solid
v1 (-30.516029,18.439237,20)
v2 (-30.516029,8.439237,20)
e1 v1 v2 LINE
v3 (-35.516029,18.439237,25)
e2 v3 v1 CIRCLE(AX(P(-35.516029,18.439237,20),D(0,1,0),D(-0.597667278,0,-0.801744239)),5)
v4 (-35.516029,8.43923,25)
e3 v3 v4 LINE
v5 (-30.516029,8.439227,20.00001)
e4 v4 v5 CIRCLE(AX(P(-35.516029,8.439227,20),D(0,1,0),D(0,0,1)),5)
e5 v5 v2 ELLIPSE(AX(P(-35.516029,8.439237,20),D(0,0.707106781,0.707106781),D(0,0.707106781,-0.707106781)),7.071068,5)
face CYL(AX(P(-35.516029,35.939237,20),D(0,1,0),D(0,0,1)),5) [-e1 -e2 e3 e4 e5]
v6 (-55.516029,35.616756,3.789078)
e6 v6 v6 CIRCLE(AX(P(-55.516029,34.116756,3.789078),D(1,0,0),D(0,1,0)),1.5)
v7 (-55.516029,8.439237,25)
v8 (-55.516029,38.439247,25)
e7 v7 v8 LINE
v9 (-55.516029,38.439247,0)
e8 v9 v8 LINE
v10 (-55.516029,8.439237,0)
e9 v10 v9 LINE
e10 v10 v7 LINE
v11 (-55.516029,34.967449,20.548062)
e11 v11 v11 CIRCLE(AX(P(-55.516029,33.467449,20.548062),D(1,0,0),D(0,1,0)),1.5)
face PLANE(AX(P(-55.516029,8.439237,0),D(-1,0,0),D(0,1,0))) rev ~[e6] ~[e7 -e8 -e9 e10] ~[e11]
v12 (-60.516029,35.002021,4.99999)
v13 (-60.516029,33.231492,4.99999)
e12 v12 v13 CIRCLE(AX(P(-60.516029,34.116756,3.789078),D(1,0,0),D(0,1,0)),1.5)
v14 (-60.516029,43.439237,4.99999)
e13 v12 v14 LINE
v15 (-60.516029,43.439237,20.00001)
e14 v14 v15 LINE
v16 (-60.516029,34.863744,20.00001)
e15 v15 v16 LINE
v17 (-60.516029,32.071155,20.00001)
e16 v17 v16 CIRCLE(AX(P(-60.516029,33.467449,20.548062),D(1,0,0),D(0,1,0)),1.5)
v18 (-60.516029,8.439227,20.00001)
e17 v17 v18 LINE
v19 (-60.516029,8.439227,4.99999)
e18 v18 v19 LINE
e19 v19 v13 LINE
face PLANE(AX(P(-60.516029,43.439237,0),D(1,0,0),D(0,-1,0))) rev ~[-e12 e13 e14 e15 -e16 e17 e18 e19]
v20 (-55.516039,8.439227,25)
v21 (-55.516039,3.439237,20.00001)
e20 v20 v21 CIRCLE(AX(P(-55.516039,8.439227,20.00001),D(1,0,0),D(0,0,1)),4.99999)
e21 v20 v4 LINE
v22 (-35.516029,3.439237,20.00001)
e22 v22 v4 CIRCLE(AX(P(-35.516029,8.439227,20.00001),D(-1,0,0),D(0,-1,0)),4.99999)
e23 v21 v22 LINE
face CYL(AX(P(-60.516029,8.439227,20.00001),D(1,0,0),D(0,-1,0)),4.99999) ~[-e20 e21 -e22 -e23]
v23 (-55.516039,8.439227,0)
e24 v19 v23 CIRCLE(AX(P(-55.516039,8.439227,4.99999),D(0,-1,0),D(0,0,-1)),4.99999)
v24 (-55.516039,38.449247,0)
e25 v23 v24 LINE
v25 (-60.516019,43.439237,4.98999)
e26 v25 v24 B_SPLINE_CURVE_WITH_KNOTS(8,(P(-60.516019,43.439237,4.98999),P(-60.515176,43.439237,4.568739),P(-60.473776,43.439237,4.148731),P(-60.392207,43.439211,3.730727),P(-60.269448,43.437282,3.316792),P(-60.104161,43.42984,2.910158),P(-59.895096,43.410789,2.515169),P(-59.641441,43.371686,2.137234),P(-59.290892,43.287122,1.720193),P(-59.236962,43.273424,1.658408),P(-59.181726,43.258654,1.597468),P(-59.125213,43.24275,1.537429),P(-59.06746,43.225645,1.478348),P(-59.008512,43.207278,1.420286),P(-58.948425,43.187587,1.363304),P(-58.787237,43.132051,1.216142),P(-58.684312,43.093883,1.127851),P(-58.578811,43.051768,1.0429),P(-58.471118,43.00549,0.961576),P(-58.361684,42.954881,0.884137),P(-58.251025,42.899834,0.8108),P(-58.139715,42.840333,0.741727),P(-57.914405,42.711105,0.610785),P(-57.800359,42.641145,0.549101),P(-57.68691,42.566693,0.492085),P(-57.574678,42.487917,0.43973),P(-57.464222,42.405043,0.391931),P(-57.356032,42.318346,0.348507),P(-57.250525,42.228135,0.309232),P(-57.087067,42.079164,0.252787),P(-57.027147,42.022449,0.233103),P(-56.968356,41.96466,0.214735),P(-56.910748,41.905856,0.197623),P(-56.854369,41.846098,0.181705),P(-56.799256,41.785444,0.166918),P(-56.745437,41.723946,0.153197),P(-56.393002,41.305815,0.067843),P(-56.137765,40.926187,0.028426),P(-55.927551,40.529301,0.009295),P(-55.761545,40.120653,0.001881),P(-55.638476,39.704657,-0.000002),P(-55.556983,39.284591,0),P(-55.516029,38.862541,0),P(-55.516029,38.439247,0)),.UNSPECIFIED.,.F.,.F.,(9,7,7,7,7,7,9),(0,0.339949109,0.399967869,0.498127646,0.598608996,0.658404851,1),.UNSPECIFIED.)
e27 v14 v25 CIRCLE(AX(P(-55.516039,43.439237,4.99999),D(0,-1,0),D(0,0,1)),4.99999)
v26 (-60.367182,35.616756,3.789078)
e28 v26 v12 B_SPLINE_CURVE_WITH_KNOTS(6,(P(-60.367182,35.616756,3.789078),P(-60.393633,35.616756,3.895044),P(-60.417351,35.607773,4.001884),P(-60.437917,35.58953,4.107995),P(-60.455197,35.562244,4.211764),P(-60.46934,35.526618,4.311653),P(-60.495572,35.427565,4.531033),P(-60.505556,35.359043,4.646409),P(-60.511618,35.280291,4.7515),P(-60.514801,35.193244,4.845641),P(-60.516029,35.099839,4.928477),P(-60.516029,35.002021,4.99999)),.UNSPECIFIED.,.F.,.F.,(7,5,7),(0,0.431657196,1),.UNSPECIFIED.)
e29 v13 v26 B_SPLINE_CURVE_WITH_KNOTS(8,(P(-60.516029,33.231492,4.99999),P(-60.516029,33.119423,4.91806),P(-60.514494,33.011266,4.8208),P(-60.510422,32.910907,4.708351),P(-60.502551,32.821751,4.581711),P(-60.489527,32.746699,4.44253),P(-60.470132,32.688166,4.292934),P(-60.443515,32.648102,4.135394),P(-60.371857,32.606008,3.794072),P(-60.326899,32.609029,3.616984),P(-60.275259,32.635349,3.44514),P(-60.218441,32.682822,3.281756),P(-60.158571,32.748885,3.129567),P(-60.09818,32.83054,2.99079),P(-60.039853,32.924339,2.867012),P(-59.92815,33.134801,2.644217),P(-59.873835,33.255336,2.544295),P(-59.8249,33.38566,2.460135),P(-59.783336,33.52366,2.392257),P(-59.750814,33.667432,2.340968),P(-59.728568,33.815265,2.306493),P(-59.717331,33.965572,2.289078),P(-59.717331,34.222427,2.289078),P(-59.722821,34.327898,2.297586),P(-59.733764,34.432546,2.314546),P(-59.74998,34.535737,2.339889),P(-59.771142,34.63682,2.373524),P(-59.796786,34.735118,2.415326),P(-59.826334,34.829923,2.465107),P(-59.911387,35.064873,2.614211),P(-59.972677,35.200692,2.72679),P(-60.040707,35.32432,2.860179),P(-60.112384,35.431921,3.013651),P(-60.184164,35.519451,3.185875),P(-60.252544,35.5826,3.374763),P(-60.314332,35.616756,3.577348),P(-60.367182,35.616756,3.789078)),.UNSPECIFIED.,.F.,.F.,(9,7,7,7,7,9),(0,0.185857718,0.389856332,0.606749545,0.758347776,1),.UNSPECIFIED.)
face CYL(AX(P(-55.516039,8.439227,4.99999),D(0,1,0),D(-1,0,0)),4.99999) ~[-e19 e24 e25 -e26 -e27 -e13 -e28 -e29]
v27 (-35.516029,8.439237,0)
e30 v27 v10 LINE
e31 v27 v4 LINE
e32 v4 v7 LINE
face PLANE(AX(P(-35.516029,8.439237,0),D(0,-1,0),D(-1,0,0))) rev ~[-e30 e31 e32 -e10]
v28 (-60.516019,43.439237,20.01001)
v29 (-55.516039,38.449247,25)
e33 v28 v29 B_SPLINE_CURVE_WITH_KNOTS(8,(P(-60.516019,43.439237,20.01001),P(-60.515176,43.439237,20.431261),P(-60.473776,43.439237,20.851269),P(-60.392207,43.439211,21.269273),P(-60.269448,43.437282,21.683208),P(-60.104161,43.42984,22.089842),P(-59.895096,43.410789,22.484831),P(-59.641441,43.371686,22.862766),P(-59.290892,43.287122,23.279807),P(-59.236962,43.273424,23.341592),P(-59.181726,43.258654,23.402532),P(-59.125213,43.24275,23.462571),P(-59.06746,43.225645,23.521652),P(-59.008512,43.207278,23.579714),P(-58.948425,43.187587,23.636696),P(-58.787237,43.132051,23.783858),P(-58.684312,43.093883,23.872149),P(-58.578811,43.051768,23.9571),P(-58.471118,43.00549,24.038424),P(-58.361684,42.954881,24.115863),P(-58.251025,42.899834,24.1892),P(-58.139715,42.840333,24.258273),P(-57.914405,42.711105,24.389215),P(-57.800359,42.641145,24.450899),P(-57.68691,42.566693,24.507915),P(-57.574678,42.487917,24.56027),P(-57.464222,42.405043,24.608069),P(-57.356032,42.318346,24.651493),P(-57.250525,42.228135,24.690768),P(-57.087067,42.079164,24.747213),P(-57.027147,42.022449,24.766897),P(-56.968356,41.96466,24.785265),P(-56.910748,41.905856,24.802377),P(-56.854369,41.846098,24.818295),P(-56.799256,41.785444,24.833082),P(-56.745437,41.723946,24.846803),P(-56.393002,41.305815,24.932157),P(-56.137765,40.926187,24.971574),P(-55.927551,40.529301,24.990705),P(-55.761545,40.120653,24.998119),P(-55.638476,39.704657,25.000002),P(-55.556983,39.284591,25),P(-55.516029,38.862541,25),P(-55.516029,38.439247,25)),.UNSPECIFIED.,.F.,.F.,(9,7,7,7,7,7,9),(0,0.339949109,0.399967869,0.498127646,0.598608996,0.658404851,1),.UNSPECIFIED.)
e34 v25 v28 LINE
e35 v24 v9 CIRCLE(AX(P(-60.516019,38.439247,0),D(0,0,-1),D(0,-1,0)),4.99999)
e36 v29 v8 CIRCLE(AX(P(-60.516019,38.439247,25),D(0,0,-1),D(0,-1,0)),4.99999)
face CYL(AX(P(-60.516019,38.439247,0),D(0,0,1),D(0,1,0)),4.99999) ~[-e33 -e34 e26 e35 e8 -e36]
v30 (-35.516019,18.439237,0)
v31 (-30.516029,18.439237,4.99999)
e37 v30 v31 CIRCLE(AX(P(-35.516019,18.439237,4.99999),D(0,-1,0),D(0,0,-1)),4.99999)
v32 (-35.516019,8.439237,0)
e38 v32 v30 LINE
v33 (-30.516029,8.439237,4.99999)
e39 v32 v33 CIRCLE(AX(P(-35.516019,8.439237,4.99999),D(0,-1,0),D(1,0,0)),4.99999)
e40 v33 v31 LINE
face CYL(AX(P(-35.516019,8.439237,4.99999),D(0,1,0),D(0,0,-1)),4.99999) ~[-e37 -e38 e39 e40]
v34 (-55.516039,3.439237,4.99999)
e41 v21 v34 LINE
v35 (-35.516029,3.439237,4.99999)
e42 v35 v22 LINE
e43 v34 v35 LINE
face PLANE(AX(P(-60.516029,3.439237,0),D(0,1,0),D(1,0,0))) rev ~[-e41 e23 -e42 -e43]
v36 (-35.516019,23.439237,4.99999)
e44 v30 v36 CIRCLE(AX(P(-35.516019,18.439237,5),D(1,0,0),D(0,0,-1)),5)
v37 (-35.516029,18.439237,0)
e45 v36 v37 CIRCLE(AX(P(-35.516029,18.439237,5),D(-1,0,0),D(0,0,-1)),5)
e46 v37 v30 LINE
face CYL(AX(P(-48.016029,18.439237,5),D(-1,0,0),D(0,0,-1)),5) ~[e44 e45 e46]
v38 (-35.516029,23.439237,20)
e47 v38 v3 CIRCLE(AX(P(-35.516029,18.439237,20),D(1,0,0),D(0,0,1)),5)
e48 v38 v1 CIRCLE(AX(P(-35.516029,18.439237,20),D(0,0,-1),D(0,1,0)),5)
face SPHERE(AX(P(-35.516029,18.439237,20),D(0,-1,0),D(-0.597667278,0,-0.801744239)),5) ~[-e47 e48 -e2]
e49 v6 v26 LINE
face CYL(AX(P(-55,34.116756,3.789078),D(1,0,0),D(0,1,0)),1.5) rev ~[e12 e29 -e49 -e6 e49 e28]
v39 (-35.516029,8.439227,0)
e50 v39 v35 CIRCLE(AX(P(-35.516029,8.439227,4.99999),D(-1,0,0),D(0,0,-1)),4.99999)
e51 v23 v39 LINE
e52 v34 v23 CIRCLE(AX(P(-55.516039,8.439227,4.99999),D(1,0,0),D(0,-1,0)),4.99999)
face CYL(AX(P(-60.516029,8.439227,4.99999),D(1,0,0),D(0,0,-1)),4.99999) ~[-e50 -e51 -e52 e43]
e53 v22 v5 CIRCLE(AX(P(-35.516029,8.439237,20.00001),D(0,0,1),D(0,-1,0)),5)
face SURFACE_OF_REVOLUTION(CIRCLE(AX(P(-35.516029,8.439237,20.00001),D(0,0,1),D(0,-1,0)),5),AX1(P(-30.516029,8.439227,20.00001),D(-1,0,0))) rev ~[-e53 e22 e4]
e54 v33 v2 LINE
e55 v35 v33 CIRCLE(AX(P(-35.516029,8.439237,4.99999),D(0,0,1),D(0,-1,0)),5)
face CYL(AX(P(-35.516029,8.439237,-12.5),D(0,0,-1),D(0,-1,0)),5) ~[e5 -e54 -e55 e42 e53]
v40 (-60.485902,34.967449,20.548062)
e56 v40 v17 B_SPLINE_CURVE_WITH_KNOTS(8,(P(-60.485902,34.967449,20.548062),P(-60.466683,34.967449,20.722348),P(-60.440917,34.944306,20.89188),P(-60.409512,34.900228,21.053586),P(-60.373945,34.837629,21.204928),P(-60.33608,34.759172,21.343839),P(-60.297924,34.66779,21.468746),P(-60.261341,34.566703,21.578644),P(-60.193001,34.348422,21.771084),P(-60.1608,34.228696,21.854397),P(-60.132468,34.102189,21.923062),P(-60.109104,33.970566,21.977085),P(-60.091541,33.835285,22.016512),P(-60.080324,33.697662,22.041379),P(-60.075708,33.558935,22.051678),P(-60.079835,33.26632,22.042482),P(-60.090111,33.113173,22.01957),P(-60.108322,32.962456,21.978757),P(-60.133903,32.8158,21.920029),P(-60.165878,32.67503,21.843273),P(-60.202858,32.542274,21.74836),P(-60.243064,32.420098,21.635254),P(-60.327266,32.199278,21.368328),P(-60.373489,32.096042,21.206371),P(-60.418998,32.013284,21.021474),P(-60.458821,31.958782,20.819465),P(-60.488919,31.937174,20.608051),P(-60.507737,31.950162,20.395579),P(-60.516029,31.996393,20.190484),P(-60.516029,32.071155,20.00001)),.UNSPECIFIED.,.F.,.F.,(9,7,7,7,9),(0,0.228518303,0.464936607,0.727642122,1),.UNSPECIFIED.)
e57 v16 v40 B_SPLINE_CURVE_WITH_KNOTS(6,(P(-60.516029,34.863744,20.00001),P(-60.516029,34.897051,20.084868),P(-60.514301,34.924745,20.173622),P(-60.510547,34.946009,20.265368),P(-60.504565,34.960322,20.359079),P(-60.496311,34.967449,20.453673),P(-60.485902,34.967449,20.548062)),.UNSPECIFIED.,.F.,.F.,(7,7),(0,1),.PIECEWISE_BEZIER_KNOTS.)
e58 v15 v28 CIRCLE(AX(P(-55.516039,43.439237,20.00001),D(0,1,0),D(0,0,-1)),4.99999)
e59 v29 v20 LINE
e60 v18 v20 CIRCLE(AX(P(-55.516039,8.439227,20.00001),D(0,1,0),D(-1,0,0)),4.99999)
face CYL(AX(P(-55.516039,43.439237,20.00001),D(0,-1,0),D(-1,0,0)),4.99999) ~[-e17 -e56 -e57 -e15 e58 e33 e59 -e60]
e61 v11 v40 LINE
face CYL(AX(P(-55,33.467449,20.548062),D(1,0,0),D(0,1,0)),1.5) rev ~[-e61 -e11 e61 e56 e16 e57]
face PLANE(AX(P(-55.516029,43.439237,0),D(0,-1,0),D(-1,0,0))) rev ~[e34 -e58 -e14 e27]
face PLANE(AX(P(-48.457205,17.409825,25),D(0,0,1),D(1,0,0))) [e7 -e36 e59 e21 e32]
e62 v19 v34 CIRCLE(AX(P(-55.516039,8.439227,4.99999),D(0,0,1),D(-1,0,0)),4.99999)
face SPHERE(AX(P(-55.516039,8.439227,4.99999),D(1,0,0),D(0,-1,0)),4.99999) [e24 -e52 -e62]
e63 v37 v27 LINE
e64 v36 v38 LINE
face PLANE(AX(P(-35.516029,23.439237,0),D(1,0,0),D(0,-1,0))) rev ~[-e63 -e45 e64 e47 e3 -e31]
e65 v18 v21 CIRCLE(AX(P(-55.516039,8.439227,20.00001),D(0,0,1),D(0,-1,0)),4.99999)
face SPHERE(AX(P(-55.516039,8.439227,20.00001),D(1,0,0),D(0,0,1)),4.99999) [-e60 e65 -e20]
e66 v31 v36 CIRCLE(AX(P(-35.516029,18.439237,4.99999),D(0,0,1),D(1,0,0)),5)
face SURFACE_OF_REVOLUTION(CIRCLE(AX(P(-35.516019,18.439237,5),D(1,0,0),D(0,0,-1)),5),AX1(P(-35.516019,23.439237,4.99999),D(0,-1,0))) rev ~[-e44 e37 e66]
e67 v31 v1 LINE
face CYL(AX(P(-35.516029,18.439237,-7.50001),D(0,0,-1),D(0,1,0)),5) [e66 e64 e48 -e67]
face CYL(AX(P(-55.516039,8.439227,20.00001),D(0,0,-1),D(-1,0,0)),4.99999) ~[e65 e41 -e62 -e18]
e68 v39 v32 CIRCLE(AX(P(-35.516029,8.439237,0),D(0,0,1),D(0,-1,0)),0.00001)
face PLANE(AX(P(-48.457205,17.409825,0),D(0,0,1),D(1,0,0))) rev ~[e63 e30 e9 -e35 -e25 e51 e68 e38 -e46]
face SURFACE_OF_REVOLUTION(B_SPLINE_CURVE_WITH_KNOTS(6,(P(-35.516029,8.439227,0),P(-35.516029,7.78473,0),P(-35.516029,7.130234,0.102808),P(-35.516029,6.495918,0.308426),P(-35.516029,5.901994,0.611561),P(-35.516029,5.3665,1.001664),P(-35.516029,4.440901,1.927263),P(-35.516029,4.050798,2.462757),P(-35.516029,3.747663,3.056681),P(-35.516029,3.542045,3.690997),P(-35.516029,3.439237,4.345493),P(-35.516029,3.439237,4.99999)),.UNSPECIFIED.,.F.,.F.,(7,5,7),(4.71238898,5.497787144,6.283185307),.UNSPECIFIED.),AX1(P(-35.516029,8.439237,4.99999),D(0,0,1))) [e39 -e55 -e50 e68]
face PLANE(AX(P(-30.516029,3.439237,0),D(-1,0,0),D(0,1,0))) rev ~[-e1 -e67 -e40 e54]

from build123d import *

# Parameters (mm, degrees)
F1_DEPTH    = 25
F2_R        = 4.99999
F3_T1_DEPTH = 40.00001
F3_T3_DEPTH = 45.00001
F3_T6_ANGLE = 90
F4_R        = 4.99999
F5_R        = 4.99999
F6_R        = 4.99999
F7_T1_DEPTH = 27.50001
F7_T3_DEPTH = 25.0000100044
F7_T6_ANGLE = 90
F7_T8_ANGLE = 233.2969892316
F9_R        = 1.5
F10_DEPTH   = 6
F11_DEPTH   = 6


# Not quite as in the source:
# - a fillet or chamfer that OpenCascade refuses, or shapes differently, is made with other operations: its cross-section is extruded or revolved along the edge and cut away or added
# - a fillet or chamfer is up to 0.001 mm smaller than in the source, because OpenCascade refuses the exact size


with BuildPart() as f1:
    # F0 (on Top) → F1 (new body)
    with BuildSketch(Plane.XY):
        Polygon((-55.5160288679, 43.4392371902), (-60.5160288679, 43.4392371902), (-60.5160288679, 3.4392371902), (-30.5160288679, 3.4392371902), (-30.5160288679, 23.4392371902), (-35.5160288679, 23.4392371902), (-35.5160288679, 8.4392371902), (-55.5160288679, 8.4392371902), align=None)
    extrude(amount=F1_DEPTH)

    # F2 (radius 5 in the source; OpenCascade refuses exactly that, so slightly less here)
    f2_edges = [f1.edges().sort_by_distance(p)[0] for p in [
        (-45.516029, 3.439237, 25),
    ]]
    fillet(f2_edges, radius=F2_R)

    # F3: fillet of radius 5 on 1 edges, made by hand

    # F3_s2 → F3_t1 (cut)
    with BuildSketch(Plane.XZ.offset(-35.9392371902)):
        with BuildLine():
            ThreePointArc((-35.5160288679, 25), (-31.980494962, 23.5355339059), (-30.5160288679, 20))
            Line((-30.5160288679, 20), (-30.5160288679, 25))
            Line((-30.5160288679, 25), (-35.5160288679, 25))
        make_face()
    extrude(amount=F3_T1_DEPTH, mode=Mode.SUBTRACT)

    # F3_s4 → F3_t3 (cut)
    with BuildSketch(Plane.XY.offset(-12.5)):
        with BuildLine():
            ThreePointArc((-35.5160288679, 3.4392371902), (-31.980494962, 4.9037032843), (-30.5160288679, 8.4392371902))
            Line((-30.5160288679, 8.4392371902), (-30.5160288679, 3.4392371902))
            Line((-30.5160288679, 3.4392371902), (-35.5160288679, 3.4392371902))
        make_face()
    extrude(amount=F3_T3_DEPTH, mode=Mode.SUBTRACT)

    # F3_s5 → F3_t6 (revolve, cut)
    with BuildSketch(Plane.XY.offset(20.00001)):
        with BuildLine():
            ThreePointArc((-35.5160288679, 3.4392371902), (-31.9804984975, 4.9036997488), (-30.5160288679, 8.4392271902))
            Line((-30.5160288679, 8.4392271902), (-30.5160288679, 3.4392371902))
            Line((-30.5160288679, 3.4392371902), (-35.5160288679, 3.4392371902))
        make_face()
    revolve(axis=Axis((-30.5160288679, 8.4392271902, 20.00001), (-1, 0, 0)), revolution_arc=F3_T6_ANGLE, mode=Mode.SUBTRACT)

    # F4 (radius 5 in the source; OpenCascade refuses exactly that, so slightly less here)
    f4_edges = [f1.edges().sort_by_distance(p)[0] for p in [
        (-30.516029, 15.939237, 0),
    ]]
    fillet(f4_edges, radius=F4_R)

    # F5 (radius 5 in the source; OpenCascade refuses exactly that, so slightly less here)
    f5_edges = [f1.edges().sort_by_distance(p)[0] for p in [
        (-60.516029, 25.939232, 25),
    ]]
    fillet(f5_edges, radius=F5_R)

    # F6 (radius 5 in the source; OpenCascade refuses exactly that, so slightly less here)
    f6_edges = [f1.edges().sort_by_distance(p)[0] for p in [
        (-55.516029, 43.439237, 12.5),
    ]]
    fillet(f6_edges, radius=F6_R)

    # F7: fillet of radius 5 on 4 edges, made by hand

    # F7_s2 → F7_t1 (cut)
    with BuildSketch(Plane.XY.offset(-7.50001)):
        with BuildLine():
            ThreePointArc((-35.5160288679, 23.4392371902), (-31.980494962, 21.9747710962), (-30.5160288679, 18.4392371902))
            Line((-30.5160288679, 18.4392371902), (-30.5160288679, 23.4392371902))
            Line((-30.5160288679, 23.4392371902), (-35.5160288679, 23.4392371902))
        make_face()
    extrude(amount=F7_T1_DEPTH, mode=Mode.SUBTRACT)

    # F7_s4 → F7_t3 (cut)
    with BuildSketch(Plane.YZ.offset(-48.0160288701)):
        with BuildLine():
            ThreePointArc((18.4392371902, 0), (21.9747710962, 1.4644660941), (23.4392371902, 5))
            Line((23.4392371902, 5), (23.4392371902, 0))
            Line((23.4392371902, 0), (18.4392371902, 0))
        make_face()
    extrude(amount=F7_T3_DEPTH, mode=Mode.SUBTRACT)

    # F7_s5 → F7_t6 (revolve, cut)
    with BuildSketch(Plane.YZ.offset(-35.5160188679)):
        with BuildLine():
            ThreePointArc((18.4392371902, 0), (21.9747675606, 1.4644625585), (23.4392371902, 4.99999))
            Line((23.4392371902, 4.99999), (23.4392371902, 0))
            Line((23.4392371902, 0), (18.4392371902, 0))
        make_face()
    revolve(axis=Axis((-35.5160188679, 23.4392371902, 4.99999), (0, -1, 0)), revolution_arc=F7_T6_ANGLE, mode=Mode.SUBTRACT)

    # F7_s7 → F7_t8 (revolve, cut)
    with BuildSketch(Plane(origin=(-32.4130099886, 0, 24.1625626894), x_dir=(0, 1, 0), z_dir=(0.8017442393, 0, -0.5976672777))):
        with BuildLine():
            ThreePointArc((23.4392371902, -5.1918835033), (21.9747710962, -8.7274174092), (18.4392371902, -10.1918835033))
            Line((18.4392371902, -10.1918835033), (23.4392371902, -10.1918835033))
            Line((23.4392371902, -10.1918835033), (23.4392371902, -5.1918835033))
        make_face()
    revolve(axis=Axis((-35.516028868, 23.4392371902, 19.9999999999), (0, 1, 0)), revolution_arc=F7_T8_ANGLE, mode=Mode.SUBTRACT)

    # F9 (on offset) → F10 (cut)
    with BuildSketch(Plane.YZ.offset(-55)):
        with Locations((33.4674492478, 20.548062399)):
            Circle(F9_R)
    extrude(amount=-F10_DEPTH, mode=Mode.SUBTRACT)

    # F9 (on offset) → F11 (cut)
    with BuildSketch(Plane.YZ.offset(-55)):
        with Locations((33.4674492478, 20.548062399)):
            Circle(F9_R)
        with Locations((34.116756171, 3.7890784442)):
            Circle(F9_R)
    extrude(amount=-F11_DEPTH, mode=Mode.SUBTRACT)


solid = f1.part
